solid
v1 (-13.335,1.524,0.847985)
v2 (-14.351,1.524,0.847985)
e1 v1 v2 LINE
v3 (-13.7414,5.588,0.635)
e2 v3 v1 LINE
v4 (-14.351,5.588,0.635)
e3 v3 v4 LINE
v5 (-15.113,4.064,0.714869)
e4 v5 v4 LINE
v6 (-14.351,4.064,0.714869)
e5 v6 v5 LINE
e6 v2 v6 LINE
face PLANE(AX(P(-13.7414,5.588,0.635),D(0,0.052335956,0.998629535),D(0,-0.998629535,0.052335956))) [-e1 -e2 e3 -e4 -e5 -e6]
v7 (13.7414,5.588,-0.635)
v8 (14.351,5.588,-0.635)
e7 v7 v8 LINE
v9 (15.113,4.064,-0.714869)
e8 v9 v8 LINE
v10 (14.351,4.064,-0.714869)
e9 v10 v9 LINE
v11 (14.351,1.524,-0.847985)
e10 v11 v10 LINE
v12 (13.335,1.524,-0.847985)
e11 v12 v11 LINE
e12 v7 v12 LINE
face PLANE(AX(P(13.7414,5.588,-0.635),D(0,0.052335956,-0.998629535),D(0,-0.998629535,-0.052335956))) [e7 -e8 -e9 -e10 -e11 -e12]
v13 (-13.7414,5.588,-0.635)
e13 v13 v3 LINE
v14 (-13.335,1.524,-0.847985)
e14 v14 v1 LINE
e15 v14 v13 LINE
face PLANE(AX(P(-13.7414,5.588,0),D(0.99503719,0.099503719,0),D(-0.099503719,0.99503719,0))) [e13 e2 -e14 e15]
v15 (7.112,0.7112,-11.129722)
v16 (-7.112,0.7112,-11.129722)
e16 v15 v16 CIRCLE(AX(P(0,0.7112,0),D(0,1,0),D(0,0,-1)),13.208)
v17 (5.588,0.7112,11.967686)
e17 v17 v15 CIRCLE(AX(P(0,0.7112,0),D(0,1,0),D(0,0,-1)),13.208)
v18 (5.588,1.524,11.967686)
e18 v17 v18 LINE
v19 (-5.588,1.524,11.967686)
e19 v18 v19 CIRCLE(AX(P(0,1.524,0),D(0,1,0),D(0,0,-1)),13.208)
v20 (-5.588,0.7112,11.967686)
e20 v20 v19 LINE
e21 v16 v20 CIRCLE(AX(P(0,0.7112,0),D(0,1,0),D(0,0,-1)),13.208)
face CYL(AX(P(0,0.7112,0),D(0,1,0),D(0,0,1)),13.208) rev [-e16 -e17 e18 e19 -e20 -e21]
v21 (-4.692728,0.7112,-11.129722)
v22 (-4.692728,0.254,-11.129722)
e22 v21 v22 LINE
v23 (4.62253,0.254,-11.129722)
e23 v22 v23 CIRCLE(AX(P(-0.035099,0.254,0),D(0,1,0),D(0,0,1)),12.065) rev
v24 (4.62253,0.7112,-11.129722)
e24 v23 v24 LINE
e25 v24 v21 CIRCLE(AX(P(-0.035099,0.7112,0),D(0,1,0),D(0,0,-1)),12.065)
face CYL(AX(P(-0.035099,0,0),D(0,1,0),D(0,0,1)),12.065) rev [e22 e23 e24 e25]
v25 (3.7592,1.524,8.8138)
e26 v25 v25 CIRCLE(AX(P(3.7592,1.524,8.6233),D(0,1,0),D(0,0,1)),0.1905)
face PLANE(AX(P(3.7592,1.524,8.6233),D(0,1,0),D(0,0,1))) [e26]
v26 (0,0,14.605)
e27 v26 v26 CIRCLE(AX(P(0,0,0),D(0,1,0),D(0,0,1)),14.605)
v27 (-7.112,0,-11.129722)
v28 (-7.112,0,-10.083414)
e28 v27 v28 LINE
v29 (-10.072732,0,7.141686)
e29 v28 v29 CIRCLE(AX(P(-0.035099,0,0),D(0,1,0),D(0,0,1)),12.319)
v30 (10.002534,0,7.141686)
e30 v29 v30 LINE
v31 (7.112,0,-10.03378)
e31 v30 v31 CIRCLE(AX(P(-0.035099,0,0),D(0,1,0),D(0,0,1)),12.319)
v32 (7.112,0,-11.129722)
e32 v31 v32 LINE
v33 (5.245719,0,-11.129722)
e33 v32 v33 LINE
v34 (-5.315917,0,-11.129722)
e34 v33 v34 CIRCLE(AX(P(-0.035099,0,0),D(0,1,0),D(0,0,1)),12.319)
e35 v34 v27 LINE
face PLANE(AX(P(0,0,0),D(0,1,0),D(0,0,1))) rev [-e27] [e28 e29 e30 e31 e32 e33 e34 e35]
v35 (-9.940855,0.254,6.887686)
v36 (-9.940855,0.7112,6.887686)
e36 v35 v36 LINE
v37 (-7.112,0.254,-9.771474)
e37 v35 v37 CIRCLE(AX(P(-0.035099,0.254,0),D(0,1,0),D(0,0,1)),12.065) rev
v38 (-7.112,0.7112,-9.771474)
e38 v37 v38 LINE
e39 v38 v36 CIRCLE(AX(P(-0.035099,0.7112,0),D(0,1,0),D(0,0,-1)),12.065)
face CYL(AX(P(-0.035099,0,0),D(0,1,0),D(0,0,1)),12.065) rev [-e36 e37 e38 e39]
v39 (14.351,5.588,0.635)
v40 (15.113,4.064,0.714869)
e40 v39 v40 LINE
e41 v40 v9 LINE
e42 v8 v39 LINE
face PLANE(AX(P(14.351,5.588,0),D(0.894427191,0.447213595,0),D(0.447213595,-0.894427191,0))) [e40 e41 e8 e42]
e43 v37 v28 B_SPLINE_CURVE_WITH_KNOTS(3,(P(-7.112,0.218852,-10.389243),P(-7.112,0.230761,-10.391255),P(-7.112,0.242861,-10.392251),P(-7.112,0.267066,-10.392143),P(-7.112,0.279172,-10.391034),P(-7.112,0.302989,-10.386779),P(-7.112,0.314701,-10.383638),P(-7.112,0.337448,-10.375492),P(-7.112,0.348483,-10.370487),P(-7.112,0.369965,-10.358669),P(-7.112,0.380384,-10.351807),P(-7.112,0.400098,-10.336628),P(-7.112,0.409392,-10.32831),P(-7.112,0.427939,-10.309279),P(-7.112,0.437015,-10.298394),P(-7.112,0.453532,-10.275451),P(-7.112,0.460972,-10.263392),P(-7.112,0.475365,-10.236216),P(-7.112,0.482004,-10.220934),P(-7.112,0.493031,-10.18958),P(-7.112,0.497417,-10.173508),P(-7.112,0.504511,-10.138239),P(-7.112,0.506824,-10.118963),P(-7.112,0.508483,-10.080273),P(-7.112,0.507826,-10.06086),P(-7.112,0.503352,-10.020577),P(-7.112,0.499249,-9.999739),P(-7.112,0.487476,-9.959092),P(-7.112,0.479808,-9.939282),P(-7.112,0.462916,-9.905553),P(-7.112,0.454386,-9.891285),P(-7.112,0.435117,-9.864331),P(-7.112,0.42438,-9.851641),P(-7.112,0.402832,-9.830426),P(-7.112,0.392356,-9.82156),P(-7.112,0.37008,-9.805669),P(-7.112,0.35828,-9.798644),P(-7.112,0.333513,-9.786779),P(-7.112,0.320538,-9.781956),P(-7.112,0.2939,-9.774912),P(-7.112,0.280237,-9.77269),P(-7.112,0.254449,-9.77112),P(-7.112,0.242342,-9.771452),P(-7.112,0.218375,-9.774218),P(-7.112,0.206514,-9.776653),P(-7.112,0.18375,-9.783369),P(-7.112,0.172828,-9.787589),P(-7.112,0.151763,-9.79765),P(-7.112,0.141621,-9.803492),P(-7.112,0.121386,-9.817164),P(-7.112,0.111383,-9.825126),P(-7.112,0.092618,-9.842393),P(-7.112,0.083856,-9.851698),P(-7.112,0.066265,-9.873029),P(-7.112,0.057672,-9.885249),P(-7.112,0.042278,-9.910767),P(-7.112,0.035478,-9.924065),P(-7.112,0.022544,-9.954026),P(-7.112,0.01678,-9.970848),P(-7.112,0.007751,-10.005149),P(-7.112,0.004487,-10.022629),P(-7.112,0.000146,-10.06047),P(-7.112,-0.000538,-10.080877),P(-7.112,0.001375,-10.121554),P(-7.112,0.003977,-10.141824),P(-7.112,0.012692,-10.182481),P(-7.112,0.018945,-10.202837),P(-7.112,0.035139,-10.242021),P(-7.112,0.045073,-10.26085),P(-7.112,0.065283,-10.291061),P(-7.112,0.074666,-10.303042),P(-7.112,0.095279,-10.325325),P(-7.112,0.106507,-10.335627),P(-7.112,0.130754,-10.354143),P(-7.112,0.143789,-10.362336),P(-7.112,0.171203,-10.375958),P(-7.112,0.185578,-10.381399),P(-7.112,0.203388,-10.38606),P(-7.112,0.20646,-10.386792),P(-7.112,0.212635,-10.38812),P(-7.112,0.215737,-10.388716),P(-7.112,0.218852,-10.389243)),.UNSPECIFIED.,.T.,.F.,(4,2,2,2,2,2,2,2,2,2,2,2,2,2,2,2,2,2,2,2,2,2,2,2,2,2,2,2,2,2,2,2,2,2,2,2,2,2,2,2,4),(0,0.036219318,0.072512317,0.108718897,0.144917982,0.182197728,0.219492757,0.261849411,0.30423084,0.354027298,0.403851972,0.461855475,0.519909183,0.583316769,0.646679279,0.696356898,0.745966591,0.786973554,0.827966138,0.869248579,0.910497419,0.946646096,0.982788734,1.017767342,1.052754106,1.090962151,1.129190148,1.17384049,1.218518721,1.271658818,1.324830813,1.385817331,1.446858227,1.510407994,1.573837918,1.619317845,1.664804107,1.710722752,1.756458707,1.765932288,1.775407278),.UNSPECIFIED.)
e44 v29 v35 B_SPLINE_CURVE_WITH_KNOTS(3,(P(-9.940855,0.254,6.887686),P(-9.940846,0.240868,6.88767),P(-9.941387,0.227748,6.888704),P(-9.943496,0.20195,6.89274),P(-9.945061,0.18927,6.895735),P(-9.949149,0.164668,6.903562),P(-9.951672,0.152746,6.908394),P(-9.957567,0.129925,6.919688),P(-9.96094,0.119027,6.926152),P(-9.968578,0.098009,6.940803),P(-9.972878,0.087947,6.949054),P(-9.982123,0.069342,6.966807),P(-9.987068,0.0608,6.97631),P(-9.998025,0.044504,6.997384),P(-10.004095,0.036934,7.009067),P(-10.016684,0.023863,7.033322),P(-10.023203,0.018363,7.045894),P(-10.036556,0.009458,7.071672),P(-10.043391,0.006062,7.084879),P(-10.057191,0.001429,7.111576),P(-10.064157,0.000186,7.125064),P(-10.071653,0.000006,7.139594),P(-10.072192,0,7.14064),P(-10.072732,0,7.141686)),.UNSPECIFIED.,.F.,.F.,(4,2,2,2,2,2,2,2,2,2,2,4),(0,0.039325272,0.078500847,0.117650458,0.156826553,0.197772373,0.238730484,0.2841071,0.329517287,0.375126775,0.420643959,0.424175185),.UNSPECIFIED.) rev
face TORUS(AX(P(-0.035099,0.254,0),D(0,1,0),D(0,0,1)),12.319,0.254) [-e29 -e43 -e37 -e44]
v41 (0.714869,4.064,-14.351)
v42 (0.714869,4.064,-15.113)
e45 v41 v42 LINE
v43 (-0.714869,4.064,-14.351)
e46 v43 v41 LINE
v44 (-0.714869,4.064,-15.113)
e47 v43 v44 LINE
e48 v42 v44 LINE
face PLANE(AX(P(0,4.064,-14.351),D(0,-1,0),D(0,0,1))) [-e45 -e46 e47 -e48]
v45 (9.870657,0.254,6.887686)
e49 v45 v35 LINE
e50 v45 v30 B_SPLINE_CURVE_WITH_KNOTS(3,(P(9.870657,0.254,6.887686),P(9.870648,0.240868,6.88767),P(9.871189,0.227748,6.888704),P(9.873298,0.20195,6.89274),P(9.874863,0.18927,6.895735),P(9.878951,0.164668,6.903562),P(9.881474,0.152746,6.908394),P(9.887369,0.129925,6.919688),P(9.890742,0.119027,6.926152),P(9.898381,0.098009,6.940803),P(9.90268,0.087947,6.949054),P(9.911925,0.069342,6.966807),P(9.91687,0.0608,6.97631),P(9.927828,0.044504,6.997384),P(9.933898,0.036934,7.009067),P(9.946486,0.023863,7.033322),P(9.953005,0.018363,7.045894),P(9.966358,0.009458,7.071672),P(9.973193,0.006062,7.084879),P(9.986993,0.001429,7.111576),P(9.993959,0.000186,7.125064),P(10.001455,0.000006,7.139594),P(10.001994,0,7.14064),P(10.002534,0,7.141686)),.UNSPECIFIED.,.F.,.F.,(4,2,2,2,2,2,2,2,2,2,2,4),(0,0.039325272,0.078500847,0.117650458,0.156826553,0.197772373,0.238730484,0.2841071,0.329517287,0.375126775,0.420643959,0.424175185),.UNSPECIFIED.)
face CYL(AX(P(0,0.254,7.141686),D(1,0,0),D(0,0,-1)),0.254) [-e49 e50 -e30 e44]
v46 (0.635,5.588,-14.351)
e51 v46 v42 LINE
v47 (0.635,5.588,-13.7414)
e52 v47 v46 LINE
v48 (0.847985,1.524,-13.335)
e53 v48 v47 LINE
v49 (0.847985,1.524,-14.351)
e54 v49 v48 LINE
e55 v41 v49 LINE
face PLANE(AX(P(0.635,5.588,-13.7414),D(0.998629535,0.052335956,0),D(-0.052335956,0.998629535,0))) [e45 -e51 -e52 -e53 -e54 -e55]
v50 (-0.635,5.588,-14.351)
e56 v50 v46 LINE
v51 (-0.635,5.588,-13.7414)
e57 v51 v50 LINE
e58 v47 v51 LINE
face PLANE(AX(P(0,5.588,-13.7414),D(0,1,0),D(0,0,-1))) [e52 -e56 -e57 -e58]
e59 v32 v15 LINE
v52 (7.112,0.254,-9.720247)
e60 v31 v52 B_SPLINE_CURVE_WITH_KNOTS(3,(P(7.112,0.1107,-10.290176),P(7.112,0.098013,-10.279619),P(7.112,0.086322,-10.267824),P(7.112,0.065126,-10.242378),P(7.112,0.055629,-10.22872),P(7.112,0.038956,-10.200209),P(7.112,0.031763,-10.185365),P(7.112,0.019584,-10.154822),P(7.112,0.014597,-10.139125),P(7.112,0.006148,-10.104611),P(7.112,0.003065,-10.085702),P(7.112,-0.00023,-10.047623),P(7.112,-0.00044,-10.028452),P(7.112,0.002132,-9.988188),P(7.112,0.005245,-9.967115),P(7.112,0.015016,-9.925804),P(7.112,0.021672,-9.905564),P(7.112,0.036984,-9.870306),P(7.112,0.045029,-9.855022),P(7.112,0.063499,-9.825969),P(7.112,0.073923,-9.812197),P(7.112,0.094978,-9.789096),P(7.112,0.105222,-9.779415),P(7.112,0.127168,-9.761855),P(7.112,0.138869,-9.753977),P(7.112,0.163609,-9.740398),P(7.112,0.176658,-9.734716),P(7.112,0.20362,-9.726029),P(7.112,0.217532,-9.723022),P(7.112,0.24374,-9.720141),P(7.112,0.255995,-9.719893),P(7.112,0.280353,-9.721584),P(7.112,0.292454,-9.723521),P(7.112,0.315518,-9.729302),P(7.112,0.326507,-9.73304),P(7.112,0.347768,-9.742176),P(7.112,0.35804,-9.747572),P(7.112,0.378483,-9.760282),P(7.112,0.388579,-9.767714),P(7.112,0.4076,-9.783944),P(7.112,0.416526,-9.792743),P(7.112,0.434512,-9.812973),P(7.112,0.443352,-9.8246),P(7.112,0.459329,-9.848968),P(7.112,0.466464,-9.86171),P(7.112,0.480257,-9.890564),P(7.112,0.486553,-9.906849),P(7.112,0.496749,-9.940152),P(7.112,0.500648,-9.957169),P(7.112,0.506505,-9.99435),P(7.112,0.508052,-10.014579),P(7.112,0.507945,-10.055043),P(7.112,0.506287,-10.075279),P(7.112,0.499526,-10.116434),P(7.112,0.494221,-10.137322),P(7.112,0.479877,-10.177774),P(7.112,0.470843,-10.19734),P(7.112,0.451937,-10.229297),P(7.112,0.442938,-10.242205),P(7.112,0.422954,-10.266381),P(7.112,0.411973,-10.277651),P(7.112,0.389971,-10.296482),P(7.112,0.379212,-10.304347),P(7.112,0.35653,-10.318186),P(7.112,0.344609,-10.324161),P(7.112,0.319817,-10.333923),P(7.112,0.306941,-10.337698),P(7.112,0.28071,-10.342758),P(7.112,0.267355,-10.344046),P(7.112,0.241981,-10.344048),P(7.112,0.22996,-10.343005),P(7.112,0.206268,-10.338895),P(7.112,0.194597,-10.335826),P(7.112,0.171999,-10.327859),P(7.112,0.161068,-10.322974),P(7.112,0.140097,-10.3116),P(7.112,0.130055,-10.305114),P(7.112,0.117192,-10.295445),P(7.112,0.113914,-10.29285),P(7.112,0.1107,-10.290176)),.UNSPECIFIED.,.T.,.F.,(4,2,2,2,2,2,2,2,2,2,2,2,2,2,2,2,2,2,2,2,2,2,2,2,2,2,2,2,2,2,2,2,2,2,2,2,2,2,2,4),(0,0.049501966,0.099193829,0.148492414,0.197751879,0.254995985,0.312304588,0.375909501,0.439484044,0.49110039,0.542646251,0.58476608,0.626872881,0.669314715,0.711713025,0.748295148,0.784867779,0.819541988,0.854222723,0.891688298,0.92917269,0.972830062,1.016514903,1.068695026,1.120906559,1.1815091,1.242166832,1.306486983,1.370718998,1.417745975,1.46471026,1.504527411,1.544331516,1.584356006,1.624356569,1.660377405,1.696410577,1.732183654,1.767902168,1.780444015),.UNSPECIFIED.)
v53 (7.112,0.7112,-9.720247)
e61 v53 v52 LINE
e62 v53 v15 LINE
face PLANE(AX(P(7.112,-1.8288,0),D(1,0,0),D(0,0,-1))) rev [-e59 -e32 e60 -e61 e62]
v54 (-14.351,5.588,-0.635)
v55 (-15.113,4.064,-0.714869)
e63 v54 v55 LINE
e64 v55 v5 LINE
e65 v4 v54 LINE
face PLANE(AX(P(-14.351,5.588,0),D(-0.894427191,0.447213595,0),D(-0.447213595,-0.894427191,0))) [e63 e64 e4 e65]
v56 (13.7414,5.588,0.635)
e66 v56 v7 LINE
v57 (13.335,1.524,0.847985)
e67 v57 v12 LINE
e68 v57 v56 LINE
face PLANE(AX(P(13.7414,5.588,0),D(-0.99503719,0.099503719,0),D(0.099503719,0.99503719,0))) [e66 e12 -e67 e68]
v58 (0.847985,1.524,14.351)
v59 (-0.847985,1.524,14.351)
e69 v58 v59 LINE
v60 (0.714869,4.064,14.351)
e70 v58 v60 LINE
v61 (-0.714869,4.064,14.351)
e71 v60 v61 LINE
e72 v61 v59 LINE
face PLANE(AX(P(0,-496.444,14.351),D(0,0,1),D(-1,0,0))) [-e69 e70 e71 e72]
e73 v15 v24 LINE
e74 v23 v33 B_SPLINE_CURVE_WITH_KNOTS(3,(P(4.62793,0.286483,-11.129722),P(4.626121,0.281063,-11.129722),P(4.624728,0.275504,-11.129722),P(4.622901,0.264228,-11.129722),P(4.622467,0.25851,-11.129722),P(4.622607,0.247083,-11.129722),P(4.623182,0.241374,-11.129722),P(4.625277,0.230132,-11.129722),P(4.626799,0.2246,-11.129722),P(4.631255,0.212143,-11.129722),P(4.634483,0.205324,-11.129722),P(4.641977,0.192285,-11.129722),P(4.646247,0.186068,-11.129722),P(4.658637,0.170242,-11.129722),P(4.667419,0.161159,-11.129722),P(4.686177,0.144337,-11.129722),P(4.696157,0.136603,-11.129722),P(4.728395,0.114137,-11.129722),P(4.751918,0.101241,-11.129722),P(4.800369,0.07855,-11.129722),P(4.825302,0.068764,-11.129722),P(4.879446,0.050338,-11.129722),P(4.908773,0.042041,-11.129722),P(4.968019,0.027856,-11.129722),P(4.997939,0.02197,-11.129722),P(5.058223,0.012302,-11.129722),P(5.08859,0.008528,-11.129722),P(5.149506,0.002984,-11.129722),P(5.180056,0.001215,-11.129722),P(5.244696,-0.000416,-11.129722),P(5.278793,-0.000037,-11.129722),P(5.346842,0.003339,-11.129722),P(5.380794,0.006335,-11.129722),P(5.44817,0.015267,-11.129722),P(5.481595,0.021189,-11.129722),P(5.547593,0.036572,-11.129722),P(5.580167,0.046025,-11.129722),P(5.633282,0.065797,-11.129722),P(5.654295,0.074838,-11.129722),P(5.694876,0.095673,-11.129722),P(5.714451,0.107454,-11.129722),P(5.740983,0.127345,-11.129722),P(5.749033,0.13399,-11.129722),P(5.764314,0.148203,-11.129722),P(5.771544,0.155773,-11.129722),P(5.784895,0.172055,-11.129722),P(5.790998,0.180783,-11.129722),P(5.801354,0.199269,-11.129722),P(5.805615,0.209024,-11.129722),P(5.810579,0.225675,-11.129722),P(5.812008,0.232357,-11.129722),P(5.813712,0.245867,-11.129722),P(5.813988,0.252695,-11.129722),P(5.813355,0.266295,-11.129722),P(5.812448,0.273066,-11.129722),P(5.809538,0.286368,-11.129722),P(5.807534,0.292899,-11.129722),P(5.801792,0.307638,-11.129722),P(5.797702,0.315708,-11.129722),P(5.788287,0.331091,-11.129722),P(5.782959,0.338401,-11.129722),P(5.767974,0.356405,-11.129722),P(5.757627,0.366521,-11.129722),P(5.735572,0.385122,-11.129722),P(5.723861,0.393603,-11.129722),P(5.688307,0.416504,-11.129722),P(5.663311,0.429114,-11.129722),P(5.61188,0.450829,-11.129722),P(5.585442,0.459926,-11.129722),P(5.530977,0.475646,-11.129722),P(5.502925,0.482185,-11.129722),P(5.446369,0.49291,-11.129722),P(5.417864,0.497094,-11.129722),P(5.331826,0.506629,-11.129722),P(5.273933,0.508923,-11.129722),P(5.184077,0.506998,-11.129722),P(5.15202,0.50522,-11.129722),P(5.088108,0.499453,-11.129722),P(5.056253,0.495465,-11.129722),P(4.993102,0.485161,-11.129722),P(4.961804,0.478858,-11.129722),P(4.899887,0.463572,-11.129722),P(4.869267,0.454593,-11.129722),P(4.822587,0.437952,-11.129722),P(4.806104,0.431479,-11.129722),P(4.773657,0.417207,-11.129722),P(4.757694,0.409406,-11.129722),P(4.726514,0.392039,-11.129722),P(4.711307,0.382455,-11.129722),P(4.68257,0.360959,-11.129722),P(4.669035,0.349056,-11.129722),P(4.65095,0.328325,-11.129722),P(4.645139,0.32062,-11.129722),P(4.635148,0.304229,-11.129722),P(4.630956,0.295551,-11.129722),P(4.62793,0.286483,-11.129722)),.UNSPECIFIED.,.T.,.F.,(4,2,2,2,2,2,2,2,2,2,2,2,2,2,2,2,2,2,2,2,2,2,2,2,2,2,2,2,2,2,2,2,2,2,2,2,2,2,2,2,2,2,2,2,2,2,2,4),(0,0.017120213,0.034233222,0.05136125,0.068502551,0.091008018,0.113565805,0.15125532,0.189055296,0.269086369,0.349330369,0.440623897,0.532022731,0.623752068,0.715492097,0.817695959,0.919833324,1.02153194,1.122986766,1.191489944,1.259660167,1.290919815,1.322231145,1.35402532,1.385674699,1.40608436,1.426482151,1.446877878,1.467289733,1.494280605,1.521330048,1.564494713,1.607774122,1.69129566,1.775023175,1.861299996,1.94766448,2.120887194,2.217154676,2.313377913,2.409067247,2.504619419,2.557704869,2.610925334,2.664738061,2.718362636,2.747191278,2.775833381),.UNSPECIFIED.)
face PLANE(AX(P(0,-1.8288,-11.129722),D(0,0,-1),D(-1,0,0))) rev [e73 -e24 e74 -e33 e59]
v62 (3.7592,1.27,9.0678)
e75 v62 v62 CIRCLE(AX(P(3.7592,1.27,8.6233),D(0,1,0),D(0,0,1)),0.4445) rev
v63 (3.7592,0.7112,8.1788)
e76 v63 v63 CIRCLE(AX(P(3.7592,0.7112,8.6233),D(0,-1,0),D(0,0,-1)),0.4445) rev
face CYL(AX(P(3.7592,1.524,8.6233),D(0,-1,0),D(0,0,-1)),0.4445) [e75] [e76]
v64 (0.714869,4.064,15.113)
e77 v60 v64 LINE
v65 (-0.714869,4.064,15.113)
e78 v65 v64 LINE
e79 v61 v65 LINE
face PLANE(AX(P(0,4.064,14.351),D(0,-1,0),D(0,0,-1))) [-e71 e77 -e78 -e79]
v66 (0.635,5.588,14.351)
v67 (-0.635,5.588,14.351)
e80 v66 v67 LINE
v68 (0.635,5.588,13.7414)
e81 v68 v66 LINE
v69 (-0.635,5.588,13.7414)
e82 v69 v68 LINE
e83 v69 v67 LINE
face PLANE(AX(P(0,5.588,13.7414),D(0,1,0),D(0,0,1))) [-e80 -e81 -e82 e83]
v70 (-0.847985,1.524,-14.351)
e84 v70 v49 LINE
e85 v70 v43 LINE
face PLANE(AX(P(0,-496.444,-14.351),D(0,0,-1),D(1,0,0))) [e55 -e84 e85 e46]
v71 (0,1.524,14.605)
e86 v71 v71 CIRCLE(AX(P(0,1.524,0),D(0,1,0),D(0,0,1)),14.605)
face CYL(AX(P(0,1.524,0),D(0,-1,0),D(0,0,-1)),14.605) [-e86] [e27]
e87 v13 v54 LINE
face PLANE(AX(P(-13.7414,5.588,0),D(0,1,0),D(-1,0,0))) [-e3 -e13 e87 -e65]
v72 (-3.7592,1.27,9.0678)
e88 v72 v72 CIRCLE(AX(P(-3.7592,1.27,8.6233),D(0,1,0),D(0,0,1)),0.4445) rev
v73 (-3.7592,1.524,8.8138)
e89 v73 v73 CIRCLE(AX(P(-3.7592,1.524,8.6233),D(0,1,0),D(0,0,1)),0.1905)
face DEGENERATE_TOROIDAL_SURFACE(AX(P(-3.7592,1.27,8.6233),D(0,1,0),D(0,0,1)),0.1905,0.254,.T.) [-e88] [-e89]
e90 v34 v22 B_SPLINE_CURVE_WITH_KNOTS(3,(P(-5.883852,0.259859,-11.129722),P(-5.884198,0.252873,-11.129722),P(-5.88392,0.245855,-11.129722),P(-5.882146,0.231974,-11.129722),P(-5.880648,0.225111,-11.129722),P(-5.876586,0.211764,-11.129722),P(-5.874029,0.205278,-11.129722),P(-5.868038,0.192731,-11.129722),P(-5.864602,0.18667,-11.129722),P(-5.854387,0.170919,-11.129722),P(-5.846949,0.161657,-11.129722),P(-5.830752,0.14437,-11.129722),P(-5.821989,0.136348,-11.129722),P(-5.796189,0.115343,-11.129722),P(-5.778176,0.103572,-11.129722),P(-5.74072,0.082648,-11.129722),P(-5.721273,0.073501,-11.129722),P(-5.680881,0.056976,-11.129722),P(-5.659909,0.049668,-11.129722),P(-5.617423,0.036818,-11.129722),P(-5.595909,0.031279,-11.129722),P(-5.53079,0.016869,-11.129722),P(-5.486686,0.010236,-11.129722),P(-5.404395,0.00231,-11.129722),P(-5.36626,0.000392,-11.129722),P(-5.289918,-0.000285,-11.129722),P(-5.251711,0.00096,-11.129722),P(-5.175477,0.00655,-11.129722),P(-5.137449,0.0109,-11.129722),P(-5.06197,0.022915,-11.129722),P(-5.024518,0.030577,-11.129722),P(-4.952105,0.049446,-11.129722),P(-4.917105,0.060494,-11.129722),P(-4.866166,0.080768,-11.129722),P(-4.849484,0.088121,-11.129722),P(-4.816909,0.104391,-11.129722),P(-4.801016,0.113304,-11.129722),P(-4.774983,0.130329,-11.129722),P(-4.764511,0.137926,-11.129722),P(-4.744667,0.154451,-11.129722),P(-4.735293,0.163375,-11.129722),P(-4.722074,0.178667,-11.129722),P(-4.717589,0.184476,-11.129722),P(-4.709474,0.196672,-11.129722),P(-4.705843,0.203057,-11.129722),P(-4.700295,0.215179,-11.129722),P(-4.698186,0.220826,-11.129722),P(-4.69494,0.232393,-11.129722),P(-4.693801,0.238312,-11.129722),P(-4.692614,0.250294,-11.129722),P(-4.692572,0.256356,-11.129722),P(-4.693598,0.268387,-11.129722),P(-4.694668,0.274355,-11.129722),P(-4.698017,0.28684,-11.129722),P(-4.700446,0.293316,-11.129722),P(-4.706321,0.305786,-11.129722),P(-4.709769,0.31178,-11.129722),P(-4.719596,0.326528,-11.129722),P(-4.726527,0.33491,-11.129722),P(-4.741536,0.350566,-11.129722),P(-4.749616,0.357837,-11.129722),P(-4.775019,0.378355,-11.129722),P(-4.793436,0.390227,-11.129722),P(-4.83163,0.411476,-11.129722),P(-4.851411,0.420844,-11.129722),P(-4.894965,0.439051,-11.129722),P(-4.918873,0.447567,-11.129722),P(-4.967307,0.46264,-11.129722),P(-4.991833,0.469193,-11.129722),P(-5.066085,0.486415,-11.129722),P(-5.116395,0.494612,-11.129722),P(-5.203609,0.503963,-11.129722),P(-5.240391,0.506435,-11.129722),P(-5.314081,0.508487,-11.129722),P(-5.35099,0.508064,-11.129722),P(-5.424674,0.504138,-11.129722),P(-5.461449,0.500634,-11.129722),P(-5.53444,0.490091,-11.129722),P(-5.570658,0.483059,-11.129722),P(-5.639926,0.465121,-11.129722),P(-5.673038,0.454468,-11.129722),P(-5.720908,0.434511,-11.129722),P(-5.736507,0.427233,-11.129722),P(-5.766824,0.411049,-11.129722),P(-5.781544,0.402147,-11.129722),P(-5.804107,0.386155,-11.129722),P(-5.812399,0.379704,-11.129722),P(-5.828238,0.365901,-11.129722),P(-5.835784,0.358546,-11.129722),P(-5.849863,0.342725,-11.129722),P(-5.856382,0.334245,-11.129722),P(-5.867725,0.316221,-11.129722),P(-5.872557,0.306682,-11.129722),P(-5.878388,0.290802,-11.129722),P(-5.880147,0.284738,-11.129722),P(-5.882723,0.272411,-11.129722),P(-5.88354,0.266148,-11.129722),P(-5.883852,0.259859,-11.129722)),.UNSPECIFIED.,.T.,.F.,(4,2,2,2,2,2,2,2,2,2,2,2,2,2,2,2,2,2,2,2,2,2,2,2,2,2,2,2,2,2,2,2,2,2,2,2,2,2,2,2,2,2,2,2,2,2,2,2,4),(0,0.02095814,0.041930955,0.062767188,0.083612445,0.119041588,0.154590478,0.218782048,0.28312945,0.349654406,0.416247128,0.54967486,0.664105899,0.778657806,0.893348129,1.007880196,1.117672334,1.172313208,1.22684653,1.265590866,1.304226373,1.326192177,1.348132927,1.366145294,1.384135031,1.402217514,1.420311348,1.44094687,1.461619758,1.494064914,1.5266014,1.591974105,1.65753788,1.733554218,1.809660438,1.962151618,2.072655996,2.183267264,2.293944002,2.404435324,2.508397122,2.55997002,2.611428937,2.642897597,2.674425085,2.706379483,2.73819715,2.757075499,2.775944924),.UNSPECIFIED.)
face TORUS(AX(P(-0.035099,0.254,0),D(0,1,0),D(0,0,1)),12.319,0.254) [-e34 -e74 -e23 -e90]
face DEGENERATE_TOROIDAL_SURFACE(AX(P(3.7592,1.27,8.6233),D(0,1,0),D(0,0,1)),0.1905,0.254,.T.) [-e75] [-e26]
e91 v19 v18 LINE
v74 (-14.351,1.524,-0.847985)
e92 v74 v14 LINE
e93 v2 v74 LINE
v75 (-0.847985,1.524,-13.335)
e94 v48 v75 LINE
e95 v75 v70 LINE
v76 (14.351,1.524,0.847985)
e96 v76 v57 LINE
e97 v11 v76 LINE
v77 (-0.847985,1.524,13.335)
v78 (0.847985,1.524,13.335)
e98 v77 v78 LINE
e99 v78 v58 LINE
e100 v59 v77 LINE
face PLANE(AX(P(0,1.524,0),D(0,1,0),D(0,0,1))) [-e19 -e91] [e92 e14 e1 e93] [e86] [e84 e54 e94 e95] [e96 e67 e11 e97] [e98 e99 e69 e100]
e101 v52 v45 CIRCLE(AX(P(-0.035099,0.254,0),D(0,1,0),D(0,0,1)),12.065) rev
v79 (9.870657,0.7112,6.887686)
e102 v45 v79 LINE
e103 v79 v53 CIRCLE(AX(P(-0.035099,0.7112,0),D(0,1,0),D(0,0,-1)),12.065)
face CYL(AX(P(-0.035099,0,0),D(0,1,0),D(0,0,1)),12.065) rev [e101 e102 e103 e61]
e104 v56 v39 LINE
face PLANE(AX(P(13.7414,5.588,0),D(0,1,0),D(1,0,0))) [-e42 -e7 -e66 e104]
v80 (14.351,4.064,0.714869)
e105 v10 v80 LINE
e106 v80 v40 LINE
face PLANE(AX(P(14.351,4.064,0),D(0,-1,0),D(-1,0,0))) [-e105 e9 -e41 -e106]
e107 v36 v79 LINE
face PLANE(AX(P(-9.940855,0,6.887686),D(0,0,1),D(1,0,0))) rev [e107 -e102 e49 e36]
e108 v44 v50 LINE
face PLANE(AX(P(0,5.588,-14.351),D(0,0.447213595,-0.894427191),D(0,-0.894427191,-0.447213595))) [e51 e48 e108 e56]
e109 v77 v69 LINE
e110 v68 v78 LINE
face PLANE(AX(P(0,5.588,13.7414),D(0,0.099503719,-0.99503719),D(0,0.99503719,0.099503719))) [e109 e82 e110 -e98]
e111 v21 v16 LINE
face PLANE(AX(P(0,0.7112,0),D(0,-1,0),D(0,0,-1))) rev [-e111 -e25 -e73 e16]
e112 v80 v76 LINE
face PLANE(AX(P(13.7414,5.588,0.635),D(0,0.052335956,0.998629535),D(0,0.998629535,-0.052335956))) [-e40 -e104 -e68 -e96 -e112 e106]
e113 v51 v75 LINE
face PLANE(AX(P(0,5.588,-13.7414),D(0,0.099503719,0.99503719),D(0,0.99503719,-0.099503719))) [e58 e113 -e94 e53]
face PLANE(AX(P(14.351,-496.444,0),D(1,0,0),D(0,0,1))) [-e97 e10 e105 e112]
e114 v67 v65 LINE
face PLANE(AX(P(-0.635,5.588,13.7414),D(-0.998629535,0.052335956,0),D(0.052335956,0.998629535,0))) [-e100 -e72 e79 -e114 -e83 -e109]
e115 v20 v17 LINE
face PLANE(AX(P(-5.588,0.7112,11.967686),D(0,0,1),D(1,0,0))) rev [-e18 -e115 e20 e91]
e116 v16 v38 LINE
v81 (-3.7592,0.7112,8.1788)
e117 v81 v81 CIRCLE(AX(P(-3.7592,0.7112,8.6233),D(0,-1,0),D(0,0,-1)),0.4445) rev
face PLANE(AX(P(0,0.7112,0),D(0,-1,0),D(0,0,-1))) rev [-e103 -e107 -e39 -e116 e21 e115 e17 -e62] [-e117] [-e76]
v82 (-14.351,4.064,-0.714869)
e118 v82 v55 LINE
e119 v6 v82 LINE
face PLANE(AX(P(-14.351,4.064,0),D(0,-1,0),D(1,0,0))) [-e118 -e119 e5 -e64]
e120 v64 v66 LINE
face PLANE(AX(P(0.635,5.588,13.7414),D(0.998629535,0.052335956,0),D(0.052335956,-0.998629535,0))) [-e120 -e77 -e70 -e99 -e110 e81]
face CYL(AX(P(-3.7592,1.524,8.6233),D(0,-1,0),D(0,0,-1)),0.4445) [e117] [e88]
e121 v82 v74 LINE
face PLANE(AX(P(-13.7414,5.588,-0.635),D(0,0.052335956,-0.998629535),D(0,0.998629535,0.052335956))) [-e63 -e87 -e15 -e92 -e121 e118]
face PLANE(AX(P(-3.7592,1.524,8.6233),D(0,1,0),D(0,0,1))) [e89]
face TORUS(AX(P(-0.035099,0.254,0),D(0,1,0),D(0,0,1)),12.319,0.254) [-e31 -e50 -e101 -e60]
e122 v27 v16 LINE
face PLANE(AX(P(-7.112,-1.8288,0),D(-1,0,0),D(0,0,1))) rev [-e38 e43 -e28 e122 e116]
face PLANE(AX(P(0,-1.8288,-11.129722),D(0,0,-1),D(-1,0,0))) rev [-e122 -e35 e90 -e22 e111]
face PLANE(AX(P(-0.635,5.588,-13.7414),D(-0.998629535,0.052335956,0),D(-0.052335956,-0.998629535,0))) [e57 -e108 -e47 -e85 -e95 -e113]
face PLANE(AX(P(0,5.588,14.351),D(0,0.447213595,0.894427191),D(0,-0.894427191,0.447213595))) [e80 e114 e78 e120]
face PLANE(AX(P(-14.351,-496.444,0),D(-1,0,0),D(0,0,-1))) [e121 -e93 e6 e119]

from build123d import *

# Parameters (mm, degrees)
SKETCH1_R           = 14.605
BOSS_EXTRUDE1_DEPTH = 1.524
CUT_EXTRUDE1_DEPTH  = 0.8128
SKETCH4_R           = 0.4445
BOSS_EXTRUDE2_DEPTH = 0.8128
CUT_EXTRUDE2_DEPTH  = 21.670575557
FILLET1_R           = 0.254
FILLET3_R           = 0.254
SNAP_START          = 13.7414
SNAP_HOOK1_DEPTH    = 0.6096
SNAP_START_2        = -0.714869456
SNAP_HOOK1_2_DEPTH  = 1.429738912
SNAP_START_3        = -0.847985215
SNAP_HOOK1_3_DEPTH  = 1.69597043
SNAP_START_4        = 12
SNAP_HOOK1_4_DEPTH  = 4
CIRPATTERN1_COUNT   = 4
SKETCH6_W           = 14.224
SKETCH6_H           = 9.208016637
CUT_EXTRUDE3_DEPTH  = 2.54


with BuildPart() as part:
    # Sketch1 → Boss-Extrude1 (new body)
    with BuildSketch(Plane(origin=(0, 0, 0), x_dir=(1, 0, 0), z_dir=(0, 1, 0))):
        with Locations(Location((0, 0, 0), (0, 0, 270))):
            Circle(SKETCH1_R)
    extrude(amount=BOSS_EXTRUDE1_DEPTH)

    # Sketch3 → Cut-Extrude1 (cut)
    with BuildSketch(Plane(origin=(0, 1.524, 0), x_dir=(1, 0, 0), z_dir=(0, 1, 0))):
        with BuildLine():
            Line((-5.588, -11.967686493), (5.588, -11.967686493))
            ThreePointArc((5.588, -11.967686493), (0, 13.208), (-5.588, -11.967686493))
        make_face()
    extrude(amount=-CUT_EXTRUDE1_DEPTH, mode=Mode.SUBTRACT)

    # Sketch4 → Boss-Extrude2 (add)
    with BuildSketch(Plane(origin=(0, 0.7112, 0), x_dir=(1, 0, 0), z_dir=(0, 1, 0))):
        with Locations(Location((-3.7592, -8.6233, 0), (0, 0, 90))):
            Circle(SKETCH4_R)
        with Locations(Location((3.7592, -8.6233, 0), (0, 0, 90))):
            Circle(SKETCH4_R)
    extrude(amount=BOSS_EXTRUDE2_DEPTH)

    # Sketch5 → Cut-Extrude2 (cut, through all)
    with BuildSketch(Plane(origin=(0, 0.7112, 0), x_dir=(1, 0, 0), z_dir=(0, 1, 0))):
        with BuildLine():
            Line((-9.940854815, -6.887686493), (9.870656967, -6.887686493))
            ThreePointArc((9.870656967, -6.887686493), (-0.035098924, 12.065), (-9.940854815, -6.887686493))
        make_face()
    extrude(amount=-CUT_EXTRUDE2_DEPTH, mode=Mode.SUBTRACT)

    # Fillet1
    fillet1_edges = [part.edges().sort_by_distance(p)[0] for p in [
        (-0.035098924, 0, -12.065),
        (-0.035098924, 0, 6.887686493),
    ]]
    fillet(fillet1_edges, radius=FILLET1_R)

    # Fillet3
    fillet3_edges = [part.edges().sort_by_distance(p)[0] for p in [
        (-3.7592, 1.524, 9.0678),
        (3.7592, 1.524, 9.0678),
    ]]
    fillet(fillet3_edges, radius=FILLET3_R)

    # Snap Hook1: read off the stored shape, not the designer's step
    # Snap Hook1 outline → Snap Hook1 (add)
    with BuildSketch(Plane.XY.offset(SNAP_START)):
        Polygon((-0.847985215, 1.524), (0.847985215, 1.524), (0.635, 5.588), (-0.635, 5.588), align=None)
    snap_hook1 = extrude(amount=SNAP_HOOK1_DEPTH)

    # Snap Hook1 2 outline → Snap Hook1 2 (add)
    with BuildSketch(Plane.YZ.offset(SNAP_START_2)):
        Polygon((1.524, 13.7414), (1.524, 13.335), (5.588, 13.7414), align=None)
        Polygon((4.064, 15.113), (4.064, 14.351), (5.588, 14.351), align=None)
    snap_hook1_2 = extrude(amount=SNAP_HOOK1_2_DEPTH)

    # Snap Hook1 3 outline → Snap Hook1 3 (add)
    with BuildSketch(Plane.YZ.offset(SNAP_START_3)):
        Polygon((1.524, 13.7414), (1.524, 13.335), (5.588, 13.7414), align=None)
    snap_hook1_3 = extrude(amount=SNAP_HOOK1_3_DEPTH)

    # Snap Hook1 4 outline → Snap Hook1 4 (cut)
    with BuildSketch(Plane.XY.offset(SNAP_START_4)):
        Polygon((0.847985215, 1.524), (0.847985215, 7), (0.561000216, 7), (0.635, 5.588), align=None)
        Polygon((-0.635, 5.588), (-0.561000216, 7), (-0.847985215, 7), (-0.847985215, 1.524), align=None)
    snap_hook1_4 = extrude(amount=SNAP_HOOK1_4_DEPTH, mode=Mode.SUBTRACT)

    # CirPattern1: Snap Hook1, Snap Hook1 2, Snap Hook1 3, Snap Hook1 4 ×4 about axis
    cirpattern1_axis = Axis((0, 1.524, 0), (0, 1, 0))
    add([snap_hook1.rotate(cirpattern1_axis, i * 360 / CIRPATTERN1_COUNT) for i in range(1, CIRPATTERN1_COUNT)])
    add([snap_hook1_2.rotate(cirpattern1_axis, i * 360 / CIRPATTERN1_COUNT) for i in range(1, CIRPATTERN1_COUNT)])
    add([snap_hook1_3.rotate(cirpattern1_axis, i * 360 / CIRPATTERN1_COUNT) for i in range(1, CIRPATTERN1_COUNT)])
    add([snap_hook1_4.rotate(cirpattern1_axis, i * 360 / CIRPATTERN1_COUNT) for i in range(1, CIRPATTERN1_COUNT)], mode=Mode.SUBTRACT)

    # Sketch6 → Cut-Extrude3 (cut)
    with BuildSketch(Plane(origin=(0, 0.7112, 0), x_dir=(1, 0, 0), z_dir=(0, 1, 0))):
        with Locations((0, 6.525714051)):
            Rectangle(SKETCH6_W, SKETCH6_H)
    extrude(amount=-CUT_EXTRUDE3_DEPTH, mode=Mode.SUBTRACT)


solid = part.part
